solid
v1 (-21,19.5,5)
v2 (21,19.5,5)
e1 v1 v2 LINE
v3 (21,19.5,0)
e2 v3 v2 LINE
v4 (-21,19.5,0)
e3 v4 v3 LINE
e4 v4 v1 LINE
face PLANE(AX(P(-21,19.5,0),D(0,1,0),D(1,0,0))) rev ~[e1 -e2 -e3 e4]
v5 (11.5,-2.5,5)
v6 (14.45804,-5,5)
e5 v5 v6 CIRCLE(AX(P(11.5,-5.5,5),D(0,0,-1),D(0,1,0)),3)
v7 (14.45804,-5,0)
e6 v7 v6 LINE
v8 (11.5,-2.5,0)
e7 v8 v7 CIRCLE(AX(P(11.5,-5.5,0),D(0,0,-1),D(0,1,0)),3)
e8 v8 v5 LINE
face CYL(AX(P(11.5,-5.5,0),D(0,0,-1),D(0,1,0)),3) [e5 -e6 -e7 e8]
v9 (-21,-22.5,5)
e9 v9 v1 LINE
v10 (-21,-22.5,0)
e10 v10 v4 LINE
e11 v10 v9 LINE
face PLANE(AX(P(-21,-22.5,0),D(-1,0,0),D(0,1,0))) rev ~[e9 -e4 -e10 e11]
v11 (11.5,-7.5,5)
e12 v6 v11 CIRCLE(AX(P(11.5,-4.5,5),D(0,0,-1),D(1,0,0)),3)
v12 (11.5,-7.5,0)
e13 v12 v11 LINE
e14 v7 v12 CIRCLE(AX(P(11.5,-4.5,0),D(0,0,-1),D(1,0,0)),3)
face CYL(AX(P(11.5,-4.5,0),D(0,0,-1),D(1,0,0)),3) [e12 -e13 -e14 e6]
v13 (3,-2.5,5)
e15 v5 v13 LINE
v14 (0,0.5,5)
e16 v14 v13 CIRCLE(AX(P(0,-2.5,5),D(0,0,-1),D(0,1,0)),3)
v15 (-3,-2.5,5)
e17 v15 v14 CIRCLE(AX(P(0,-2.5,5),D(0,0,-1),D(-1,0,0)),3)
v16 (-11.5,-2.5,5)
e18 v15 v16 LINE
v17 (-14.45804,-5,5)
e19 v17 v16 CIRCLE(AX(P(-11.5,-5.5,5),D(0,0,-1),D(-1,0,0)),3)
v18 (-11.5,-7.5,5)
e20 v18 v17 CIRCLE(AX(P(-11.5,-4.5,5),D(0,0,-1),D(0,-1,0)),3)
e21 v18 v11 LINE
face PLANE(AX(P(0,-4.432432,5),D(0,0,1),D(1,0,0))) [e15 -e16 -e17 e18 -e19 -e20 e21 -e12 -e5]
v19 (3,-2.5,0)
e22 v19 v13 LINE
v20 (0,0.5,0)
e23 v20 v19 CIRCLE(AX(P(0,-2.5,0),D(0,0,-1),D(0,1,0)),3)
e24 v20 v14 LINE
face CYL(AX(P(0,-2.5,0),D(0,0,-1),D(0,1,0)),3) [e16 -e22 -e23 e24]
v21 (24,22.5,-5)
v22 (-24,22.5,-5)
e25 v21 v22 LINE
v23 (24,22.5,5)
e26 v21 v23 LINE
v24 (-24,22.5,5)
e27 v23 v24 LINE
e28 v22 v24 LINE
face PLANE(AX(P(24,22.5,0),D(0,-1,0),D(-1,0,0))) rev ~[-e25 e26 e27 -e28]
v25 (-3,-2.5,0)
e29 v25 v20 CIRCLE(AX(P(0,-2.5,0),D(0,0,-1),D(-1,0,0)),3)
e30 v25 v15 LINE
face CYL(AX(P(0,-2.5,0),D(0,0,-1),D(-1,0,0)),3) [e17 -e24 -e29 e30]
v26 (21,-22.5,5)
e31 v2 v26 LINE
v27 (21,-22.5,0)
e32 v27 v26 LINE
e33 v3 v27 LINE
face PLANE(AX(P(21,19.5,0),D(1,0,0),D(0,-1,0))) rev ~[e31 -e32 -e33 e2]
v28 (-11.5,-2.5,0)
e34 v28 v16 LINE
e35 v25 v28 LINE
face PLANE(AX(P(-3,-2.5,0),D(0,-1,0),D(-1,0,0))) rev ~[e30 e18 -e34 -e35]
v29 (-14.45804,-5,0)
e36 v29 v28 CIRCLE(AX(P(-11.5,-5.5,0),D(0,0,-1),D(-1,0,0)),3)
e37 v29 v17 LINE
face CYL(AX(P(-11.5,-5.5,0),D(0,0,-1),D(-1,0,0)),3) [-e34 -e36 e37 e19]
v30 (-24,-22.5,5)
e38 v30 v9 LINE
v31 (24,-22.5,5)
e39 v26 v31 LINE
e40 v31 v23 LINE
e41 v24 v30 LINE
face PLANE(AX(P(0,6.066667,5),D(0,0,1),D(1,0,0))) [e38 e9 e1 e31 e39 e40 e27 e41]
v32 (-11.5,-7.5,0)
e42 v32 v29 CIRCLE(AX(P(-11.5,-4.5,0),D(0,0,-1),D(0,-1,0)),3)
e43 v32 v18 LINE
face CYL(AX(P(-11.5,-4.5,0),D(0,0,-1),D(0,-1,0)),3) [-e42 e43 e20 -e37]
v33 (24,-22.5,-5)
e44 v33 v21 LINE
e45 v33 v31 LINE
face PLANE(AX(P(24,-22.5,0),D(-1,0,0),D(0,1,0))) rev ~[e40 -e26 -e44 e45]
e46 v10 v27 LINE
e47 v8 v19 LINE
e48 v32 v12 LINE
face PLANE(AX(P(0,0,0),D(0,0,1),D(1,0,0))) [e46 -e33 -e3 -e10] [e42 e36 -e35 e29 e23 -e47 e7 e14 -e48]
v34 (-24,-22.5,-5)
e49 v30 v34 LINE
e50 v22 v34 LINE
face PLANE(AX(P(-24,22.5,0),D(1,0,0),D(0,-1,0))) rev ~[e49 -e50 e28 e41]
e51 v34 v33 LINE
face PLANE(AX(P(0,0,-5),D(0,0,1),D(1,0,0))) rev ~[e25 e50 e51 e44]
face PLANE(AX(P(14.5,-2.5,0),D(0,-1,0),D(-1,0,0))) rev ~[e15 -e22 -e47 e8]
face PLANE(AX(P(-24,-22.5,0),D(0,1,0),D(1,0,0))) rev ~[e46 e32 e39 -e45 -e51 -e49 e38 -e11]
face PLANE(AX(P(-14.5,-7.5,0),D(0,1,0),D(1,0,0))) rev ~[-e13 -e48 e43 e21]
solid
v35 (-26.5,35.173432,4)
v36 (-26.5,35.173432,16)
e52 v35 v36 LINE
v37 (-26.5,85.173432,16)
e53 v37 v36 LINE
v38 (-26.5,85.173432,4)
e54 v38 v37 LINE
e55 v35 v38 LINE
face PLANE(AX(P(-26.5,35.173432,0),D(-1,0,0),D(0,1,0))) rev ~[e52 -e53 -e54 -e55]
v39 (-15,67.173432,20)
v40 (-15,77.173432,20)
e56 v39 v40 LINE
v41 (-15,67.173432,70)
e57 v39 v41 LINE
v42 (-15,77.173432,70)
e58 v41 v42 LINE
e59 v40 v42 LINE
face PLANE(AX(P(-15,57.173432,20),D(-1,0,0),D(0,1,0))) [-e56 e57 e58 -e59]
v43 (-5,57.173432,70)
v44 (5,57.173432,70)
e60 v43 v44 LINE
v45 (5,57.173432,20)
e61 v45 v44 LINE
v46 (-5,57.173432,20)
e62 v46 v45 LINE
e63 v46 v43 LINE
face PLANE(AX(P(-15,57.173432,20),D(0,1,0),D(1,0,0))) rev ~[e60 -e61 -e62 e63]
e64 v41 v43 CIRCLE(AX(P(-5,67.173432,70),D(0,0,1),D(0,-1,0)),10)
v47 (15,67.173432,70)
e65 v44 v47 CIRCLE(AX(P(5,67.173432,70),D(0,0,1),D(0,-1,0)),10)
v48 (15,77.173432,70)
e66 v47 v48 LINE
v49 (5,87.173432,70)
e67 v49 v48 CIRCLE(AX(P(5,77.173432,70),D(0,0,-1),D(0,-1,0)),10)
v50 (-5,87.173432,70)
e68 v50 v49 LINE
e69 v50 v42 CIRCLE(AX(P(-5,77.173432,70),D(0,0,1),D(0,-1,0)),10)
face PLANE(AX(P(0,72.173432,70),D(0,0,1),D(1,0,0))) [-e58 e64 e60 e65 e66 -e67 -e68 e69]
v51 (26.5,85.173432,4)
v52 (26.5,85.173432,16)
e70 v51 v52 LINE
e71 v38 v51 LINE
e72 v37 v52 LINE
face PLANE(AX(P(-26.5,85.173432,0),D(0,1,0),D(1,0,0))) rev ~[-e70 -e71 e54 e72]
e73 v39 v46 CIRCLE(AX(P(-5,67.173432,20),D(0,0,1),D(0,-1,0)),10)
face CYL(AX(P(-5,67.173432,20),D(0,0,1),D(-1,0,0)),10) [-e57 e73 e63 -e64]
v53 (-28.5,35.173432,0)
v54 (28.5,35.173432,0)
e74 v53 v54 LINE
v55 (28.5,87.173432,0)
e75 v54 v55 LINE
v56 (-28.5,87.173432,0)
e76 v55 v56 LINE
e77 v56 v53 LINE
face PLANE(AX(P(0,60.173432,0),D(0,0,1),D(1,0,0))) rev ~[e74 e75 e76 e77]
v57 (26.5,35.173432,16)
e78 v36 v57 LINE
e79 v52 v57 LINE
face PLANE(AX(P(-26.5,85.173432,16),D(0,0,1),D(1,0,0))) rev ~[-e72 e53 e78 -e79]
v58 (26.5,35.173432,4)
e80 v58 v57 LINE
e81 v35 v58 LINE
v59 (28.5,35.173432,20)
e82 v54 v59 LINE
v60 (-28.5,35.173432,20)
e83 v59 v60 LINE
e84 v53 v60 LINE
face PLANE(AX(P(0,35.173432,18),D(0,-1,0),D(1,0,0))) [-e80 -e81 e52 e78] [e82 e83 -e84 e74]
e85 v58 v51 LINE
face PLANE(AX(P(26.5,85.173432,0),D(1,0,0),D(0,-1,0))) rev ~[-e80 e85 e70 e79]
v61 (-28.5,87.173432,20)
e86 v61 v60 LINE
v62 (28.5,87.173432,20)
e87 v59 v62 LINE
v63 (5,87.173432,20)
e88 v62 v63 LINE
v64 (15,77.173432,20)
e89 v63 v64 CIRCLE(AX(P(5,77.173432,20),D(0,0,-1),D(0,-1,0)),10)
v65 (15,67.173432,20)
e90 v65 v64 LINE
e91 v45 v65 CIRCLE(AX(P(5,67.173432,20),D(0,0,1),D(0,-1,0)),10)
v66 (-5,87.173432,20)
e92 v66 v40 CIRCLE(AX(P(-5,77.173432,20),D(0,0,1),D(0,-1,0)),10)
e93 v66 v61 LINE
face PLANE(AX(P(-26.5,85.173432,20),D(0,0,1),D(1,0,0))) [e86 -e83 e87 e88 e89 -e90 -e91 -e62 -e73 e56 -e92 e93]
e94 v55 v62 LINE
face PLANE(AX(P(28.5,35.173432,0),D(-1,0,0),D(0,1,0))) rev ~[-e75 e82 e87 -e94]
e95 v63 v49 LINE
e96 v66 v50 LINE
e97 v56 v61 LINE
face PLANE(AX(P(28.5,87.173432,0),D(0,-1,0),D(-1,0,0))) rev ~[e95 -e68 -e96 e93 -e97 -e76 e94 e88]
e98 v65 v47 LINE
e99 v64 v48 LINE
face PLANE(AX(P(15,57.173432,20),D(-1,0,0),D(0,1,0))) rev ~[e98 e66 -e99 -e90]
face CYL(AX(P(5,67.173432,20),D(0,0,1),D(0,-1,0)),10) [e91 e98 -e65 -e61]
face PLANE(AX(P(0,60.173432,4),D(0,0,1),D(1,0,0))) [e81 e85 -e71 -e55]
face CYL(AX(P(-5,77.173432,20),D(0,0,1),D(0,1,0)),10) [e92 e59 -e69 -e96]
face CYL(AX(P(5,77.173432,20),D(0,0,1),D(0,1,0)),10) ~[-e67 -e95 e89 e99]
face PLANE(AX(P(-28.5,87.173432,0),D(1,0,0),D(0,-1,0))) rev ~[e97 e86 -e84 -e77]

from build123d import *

# Parameters (mm, degrees)
F0_W        = 42
F0_H        = 39
F0_H_2      = 3
F1_DEPTH    = 5
F2_DEPTH    = 5
F3_T1_DEPTH = 12.5
F4_DEPTH    = 20
F0_W_2      = 53
F0_H_3      = 50
F5_DEPTH    = 4
F6_W        = 53
F6_H        = 4
F7_DEPTH    = 50
F8_W        = 30
F8_H        = 30
F9_DEPTH    = 50
F10_R       = 10


# Not quite as in the source:
# - a fillet or chamfer that OpenCascade refuses, or shapes differently, is made with other operations: its cross-section is extruded or revolved along the edge and cut away or added


with BuildPart() as f1:
    # F0 (on Top) → F1 (new body)
    with BuildSketch(Plane.XY):
        Rectangle(F0_W, F0_H)
        Polygon((-14.5, -7.5), (-14.5, -2.5), (-3, -2.5), (-3, 0.5), (3, 0.5), (3, -2.5), (14.5, -2.5), (14.5, -7.5), (3, -7.5), (-3, -7.5), align=None, mode=Mode.SUBTRACT)
        Polygon((-21, 19.5), (21, 19.5), (21, -19.5), (21, -22.5), (24, -22.5), (24, 22.5), (-24, 22.5), (-24, -22.5), (-21, -22.5), (-21, -19.5), align=None)
        with Locations((0, -21)):
            Rectangle(F0_W, F0_H_2)
        Polygon((-3, -2.5), (-14.5, -2.5), (-14.5, -7.5), (-3, -7.5), (3, -7.5), (14.5, -7.5), (14.5, -2.5), (3, -2.5), (3, 0.5), (-3, 0.5), align=None)
    extrude(amount=-F1_DEPTH)

    # F0 (on Top) → F2 (join)
    with BuildSketch(Plane.XY):
        Polygon((-3, -2.5), (-14.5, -2.5), (-14.5, -7.5), (-3, -7.5), (3, -7.5), (14.5, -7.5), (14.5, -2.5), (3, -2.5), (3, 0.5), (-3, 0.5), align=None)
        Polygon((-21, 19.5), (21, 19.5), (21, -19.5), (21, -22.5), (24, -22.5), (24, 22.5), (-24, 22.5), (-24, -22.5), (-21, -22.5), (-21, -19.5), align=None)
    extrude(amount=F2_DEPTH)

    # F3: fillet of radius 3 on 6 edges, made by hand

    # F3_s2 → F3_t1 (cut)
    with BuildSketch(Plane.XY):
        with BuildLine():
            ThreePointArc((-3, -2.5), (-2.1213203436, -0.3786796564), (0, 0.5))
            Line((0, 0.5), (-3, 0.5))
            Line((-3, 0.5), (-3, -2.5))
        make_face()
        with BuildLine():
            ThreePointArc((0, 0.5), (2.1213203436, -0.3786796564), (3, -2.5))
            Line((3, -2.5), (3, 0.5))
            Line((3, 0.5), (0, 0.5))
        make_face()
        with BuildLine():
            ThreePointArc((-14.5, -5.5), (-13.6213203436, -3.3786796564), (-11.5, -2.5))
            Line((-11.5, -2.5), (-14.5, -2.5))
            Line((-14.5, -2.5), (-14.5, -5.5))
        make_face()
        with BuildLine():
            ThreePointArc((-11.5, -7.5), (-13.6213203436, -6.6213203436), (-14.5, -4.5))
            Line((-14.5, -4.5), (-14.5, -7.5))
            Line((-14.5, -7.5), (-11.5, -7.5))
        make_face()
        with BuildLine():
            ThreePointArc((11.5, -2.5), (13.6213203436, -3.3786796564), (14.5, -5.5))
            Line((14.5, -5.5), (14.5, -2.5))
            Line((14.5, -2.5), (11.5, -2.5))
        make_face()
        with BuildLine():
            ThreePointArc((14.5, -4.5), (13.6213203436, -6.6213203436), (11.5, -7.5))
            Line((11.5, -7.5), (14.5, -7.5))
            Line((14.5, -7.5), (14.5, -4.5))
        make_face()
    extrude(amount=F3_T1_DEPTH, mode=Mode.SUBTRACT)


with BuildPart() as f4:
    # F0 (on Top) → F4 (new body)
    with BuildSketch(Plane.XY):
        Polygon((28.5, 35.1734315753), (28.5, 87.1734315753), (-28.5, 87.1734315753), (-28.5, 35.1734315753), (-26.5, 35.1734315753), (-26.5, 85.1734315753), (26.5, 85.1734315753), (26.5, 35.1734315753), align=None)
    extrude(amount=F4_DEPTH)

    # F0 (on Top) → F5 (join)
    with BuildSketch(Plane.XY):
        with Locations((0, 60.1734315753)):
            Rectangle(F0_W_2, F0_H_3)
    extrude(amount=F5_DEPTH)

    # F6 (on face) → F7 (join)
    with BuildSketch(Plane.XZ.offset(-85.1734315753)):
        with Locations((0, 18)):
            Rectangle(F6_W, F6_H)
    extrude(amount=F7_DEPTH)

    # F8 (on face) → F9 (join)
    with BuildSketch(Plane.XY.offset(20)):
        with Locations((0, 72.1734315753)):
            Rectangle(F8_W, F8_H)
    extrude(amount=F9_DEPTH)

    # F10
    f10_edges = [f4.edges().sort_by_distance(p)[0] for p in [
        (15, 57.173432, 45),
        (-15, 57.173432, 45),
        (-15, 87.173432, 45),
        (15, 87.173432, 45),
    ]]
    fillet(f10_edges, radius=F10_R)


solid = Compound([f1.part, f4.part])
